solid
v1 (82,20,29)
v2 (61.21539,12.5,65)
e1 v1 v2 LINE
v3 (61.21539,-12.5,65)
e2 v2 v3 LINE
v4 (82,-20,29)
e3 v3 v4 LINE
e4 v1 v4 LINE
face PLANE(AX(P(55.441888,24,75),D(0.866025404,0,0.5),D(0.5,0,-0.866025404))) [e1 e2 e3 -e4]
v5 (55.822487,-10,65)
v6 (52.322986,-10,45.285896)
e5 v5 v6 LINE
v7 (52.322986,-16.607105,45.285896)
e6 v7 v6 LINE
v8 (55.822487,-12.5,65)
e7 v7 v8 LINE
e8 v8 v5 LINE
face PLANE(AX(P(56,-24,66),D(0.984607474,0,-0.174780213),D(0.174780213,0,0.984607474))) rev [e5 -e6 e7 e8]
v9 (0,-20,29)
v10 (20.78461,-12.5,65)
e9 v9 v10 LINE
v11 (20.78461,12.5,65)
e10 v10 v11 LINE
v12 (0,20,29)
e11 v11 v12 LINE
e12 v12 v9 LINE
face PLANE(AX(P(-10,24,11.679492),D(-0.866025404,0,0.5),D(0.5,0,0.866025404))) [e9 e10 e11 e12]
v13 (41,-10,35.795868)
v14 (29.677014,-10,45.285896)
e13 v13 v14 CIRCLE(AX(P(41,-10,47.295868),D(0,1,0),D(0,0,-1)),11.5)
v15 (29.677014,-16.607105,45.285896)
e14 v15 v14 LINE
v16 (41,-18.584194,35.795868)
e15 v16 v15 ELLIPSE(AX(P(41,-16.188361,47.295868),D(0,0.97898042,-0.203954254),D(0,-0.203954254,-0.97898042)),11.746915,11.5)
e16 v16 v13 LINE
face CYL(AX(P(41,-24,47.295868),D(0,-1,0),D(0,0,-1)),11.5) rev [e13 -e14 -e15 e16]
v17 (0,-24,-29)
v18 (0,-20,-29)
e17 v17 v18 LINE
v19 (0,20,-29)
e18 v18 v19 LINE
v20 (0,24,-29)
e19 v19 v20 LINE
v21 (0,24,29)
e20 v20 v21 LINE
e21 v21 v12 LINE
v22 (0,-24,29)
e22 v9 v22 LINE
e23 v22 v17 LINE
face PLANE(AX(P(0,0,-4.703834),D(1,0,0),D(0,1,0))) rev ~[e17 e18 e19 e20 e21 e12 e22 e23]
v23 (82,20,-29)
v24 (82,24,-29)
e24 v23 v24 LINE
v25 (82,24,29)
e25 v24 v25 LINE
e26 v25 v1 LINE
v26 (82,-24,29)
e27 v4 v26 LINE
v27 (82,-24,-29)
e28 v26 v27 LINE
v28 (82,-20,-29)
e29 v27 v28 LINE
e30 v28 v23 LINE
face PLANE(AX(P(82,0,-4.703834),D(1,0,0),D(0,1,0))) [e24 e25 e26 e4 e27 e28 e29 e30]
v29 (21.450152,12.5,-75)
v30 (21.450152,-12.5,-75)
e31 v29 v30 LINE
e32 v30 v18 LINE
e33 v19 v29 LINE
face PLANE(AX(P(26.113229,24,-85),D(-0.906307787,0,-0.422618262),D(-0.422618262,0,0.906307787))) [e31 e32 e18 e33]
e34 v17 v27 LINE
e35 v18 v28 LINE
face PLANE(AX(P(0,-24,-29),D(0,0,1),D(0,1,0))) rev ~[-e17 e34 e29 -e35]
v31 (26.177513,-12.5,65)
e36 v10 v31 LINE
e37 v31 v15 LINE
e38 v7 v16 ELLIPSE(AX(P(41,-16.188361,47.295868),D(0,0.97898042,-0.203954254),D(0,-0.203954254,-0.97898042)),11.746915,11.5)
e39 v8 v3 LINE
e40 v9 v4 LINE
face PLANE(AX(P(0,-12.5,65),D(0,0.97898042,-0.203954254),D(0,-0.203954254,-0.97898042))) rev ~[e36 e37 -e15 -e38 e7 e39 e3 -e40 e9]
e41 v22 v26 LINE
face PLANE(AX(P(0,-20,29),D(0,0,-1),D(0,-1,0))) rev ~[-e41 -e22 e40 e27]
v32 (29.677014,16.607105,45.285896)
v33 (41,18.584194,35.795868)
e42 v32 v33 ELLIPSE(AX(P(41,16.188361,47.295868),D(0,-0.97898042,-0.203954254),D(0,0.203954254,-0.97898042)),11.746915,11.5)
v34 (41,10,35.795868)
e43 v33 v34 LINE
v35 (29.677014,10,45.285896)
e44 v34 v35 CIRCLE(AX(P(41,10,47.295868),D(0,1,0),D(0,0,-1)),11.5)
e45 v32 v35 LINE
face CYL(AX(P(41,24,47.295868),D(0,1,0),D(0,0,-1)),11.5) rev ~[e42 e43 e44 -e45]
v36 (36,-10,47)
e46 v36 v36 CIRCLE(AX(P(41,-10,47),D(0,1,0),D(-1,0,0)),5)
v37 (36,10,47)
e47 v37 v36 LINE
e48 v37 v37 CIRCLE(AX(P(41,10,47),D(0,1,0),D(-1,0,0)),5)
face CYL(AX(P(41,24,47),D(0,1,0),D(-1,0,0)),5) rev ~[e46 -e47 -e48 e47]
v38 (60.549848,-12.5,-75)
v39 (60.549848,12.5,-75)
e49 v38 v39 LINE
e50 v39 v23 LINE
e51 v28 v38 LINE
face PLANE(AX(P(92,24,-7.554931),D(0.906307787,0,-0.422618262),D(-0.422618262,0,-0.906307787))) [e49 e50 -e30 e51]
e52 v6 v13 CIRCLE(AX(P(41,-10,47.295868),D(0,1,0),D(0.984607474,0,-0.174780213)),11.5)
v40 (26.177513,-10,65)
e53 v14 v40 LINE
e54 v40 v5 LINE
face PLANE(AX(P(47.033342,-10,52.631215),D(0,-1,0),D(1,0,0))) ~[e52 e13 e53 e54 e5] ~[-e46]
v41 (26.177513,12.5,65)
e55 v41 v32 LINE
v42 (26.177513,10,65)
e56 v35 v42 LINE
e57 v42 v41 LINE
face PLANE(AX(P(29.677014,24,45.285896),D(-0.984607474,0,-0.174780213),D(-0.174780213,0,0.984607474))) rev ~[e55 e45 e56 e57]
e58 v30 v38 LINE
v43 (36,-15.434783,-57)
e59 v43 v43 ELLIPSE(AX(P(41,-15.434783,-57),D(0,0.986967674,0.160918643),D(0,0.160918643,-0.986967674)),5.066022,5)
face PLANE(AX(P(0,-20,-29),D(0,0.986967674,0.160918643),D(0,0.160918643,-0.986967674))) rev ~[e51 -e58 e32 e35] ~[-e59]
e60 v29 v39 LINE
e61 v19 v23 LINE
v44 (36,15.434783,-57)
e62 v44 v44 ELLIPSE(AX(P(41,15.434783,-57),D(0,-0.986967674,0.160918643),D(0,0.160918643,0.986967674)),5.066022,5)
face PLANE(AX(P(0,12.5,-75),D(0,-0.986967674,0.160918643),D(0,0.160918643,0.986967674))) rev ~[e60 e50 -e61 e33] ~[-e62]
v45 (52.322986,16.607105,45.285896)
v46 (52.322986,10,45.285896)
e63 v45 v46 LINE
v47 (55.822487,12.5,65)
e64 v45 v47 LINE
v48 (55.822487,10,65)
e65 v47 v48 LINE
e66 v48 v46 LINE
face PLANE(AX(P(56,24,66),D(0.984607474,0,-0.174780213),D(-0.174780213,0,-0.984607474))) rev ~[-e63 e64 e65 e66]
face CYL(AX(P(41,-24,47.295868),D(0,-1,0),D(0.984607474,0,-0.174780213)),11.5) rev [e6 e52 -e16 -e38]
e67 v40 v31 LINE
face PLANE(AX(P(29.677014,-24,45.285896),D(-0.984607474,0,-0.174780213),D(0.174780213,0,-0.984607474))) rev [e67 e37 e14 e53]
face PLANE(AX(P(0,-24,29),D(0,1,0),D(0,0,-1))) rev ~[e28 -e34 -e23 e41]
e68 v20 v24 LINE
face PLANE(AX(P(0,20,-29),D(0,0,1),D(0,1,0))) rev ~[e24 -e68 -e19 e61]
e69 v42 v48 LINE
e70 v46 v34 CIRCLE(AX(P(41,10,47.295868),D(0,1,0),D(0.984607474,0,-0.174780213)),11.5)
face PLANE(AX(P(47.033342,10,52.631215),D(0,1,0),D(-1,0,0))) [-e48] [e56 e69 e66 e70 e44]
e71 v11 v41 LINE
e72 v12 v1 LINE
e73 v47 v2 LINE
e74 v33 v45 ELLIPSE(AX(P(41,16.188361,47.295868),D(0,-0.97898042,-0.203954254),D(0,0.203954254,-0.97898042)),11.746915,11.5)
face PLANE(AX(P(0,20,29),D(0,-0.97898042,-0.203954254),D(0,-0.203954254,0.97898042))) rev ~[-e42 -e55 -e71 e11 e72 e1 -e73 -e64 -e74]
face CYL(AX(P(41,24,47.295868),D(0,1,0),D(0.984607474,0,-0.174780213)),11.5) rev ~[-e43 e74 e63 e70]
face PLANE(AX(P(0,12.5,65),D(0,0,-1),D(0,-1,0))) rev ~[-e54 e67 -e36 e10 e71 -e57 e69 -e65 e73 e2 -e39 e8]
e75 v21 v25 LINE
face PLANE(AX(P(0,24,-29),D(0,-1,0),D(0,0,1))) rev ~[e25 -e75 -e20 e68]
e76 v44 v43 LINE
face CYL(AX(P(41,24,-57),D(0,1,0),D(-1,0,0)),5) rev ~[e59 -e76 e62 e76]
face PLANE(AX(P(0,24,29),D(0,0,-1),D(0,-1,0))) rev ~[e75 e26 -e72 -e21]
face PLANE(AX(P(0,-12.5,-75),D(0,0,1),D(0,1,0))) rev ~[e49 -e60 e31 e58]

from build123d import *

# Parameters (mm, degrees)
F1_DEPTH = 82
F2_R     = 5
F3_DEPTH = 48
F5_DEPTH = 14


# Not quite as in the source:
# - a pattern or mirror of a feature is missing from the dataset's text; its kind, count and spacing are read off the source's solid


with BuildPart() as f1:
    # F0 (on Right) → F1 (new body)
    with BuildSketch(Plane.YZ):
        Polygon((12.5, 65), (-12.5, 65), (-20, 29), (-24, 29), (-24, -29), (-20, -29), (-12.5, -75), (12.5, -75), (20, -29), (24, -29), (24, 29), (20, 29), align=None)
    extrude(amount=F1_DEPTH)

    # F2 (on face) → F3 (intersect, through all)
    with BuildSketch(Plane(origin=(0, 24, 0), x_dir=(-1, 0, 0), z_dir=(0, 1, 0))):
        Polygon((-26.5581123827, 75), (-55.4418876173, 75), (-92, 11.6794919243), (-92, -7.5549307949), (-55.8867711433, -85), (-26.1132288567, -85), (10, -7.5549307949), (10, 11.6794919243), align=None)
        with Locations((-41, -57)):
            Circle(F2_R, mode=Mode.SUBTRACT)
        with Locations((-41, 47)):
            Circle(F2_R, mode=Mode.SUBTRACT)
    extrude(amount=-F3_DEPTH, mode=Mode.INTERSECT)

    # F4 (on face) → F5 (cut)
    with BuildSketch(Plane(origin=(0, 24, 0), x_dir=(-1, 0, 0), z_dir=(0, 1, 0))):
        with BuildLine():
            ThreePointArc((-52.3229859469, 45.2858959478), (-48.3869925151, 38.4821097444), (-41, 35.7958683968))
            Line((-41, 35.7958683968), (-41, 66))
            Line((-41, 66), (-56, 66))
            Line((-56, 66), (-52.3229859469, 45.2858959478))
        make_face()
        with BuildLine():
            Line((-41, 66), (-41, 35.7958683968))
            ThreePointArc((-41, 35.7958683968), (-33.6130074849, 38.4821097444), (-29.6770140531, 45.2858959478))
            Line((-29.6770140531, 45.2858959478), (-26, 66))
            Line((-26, 66), (-41, 66))
        make_face()
    f5 = extrude(amount=-F5_DEPTH, mode=Mode.SUBTRACT)

    # F5_copies: F5 across plane
    add(f5.mirror(Plane(origin=(0, 0, 0), x_dir=(0, 0, -1), z_dir=(0, -1, 0))), mode=Mode.SUBTRACT)


solid = f1.part
